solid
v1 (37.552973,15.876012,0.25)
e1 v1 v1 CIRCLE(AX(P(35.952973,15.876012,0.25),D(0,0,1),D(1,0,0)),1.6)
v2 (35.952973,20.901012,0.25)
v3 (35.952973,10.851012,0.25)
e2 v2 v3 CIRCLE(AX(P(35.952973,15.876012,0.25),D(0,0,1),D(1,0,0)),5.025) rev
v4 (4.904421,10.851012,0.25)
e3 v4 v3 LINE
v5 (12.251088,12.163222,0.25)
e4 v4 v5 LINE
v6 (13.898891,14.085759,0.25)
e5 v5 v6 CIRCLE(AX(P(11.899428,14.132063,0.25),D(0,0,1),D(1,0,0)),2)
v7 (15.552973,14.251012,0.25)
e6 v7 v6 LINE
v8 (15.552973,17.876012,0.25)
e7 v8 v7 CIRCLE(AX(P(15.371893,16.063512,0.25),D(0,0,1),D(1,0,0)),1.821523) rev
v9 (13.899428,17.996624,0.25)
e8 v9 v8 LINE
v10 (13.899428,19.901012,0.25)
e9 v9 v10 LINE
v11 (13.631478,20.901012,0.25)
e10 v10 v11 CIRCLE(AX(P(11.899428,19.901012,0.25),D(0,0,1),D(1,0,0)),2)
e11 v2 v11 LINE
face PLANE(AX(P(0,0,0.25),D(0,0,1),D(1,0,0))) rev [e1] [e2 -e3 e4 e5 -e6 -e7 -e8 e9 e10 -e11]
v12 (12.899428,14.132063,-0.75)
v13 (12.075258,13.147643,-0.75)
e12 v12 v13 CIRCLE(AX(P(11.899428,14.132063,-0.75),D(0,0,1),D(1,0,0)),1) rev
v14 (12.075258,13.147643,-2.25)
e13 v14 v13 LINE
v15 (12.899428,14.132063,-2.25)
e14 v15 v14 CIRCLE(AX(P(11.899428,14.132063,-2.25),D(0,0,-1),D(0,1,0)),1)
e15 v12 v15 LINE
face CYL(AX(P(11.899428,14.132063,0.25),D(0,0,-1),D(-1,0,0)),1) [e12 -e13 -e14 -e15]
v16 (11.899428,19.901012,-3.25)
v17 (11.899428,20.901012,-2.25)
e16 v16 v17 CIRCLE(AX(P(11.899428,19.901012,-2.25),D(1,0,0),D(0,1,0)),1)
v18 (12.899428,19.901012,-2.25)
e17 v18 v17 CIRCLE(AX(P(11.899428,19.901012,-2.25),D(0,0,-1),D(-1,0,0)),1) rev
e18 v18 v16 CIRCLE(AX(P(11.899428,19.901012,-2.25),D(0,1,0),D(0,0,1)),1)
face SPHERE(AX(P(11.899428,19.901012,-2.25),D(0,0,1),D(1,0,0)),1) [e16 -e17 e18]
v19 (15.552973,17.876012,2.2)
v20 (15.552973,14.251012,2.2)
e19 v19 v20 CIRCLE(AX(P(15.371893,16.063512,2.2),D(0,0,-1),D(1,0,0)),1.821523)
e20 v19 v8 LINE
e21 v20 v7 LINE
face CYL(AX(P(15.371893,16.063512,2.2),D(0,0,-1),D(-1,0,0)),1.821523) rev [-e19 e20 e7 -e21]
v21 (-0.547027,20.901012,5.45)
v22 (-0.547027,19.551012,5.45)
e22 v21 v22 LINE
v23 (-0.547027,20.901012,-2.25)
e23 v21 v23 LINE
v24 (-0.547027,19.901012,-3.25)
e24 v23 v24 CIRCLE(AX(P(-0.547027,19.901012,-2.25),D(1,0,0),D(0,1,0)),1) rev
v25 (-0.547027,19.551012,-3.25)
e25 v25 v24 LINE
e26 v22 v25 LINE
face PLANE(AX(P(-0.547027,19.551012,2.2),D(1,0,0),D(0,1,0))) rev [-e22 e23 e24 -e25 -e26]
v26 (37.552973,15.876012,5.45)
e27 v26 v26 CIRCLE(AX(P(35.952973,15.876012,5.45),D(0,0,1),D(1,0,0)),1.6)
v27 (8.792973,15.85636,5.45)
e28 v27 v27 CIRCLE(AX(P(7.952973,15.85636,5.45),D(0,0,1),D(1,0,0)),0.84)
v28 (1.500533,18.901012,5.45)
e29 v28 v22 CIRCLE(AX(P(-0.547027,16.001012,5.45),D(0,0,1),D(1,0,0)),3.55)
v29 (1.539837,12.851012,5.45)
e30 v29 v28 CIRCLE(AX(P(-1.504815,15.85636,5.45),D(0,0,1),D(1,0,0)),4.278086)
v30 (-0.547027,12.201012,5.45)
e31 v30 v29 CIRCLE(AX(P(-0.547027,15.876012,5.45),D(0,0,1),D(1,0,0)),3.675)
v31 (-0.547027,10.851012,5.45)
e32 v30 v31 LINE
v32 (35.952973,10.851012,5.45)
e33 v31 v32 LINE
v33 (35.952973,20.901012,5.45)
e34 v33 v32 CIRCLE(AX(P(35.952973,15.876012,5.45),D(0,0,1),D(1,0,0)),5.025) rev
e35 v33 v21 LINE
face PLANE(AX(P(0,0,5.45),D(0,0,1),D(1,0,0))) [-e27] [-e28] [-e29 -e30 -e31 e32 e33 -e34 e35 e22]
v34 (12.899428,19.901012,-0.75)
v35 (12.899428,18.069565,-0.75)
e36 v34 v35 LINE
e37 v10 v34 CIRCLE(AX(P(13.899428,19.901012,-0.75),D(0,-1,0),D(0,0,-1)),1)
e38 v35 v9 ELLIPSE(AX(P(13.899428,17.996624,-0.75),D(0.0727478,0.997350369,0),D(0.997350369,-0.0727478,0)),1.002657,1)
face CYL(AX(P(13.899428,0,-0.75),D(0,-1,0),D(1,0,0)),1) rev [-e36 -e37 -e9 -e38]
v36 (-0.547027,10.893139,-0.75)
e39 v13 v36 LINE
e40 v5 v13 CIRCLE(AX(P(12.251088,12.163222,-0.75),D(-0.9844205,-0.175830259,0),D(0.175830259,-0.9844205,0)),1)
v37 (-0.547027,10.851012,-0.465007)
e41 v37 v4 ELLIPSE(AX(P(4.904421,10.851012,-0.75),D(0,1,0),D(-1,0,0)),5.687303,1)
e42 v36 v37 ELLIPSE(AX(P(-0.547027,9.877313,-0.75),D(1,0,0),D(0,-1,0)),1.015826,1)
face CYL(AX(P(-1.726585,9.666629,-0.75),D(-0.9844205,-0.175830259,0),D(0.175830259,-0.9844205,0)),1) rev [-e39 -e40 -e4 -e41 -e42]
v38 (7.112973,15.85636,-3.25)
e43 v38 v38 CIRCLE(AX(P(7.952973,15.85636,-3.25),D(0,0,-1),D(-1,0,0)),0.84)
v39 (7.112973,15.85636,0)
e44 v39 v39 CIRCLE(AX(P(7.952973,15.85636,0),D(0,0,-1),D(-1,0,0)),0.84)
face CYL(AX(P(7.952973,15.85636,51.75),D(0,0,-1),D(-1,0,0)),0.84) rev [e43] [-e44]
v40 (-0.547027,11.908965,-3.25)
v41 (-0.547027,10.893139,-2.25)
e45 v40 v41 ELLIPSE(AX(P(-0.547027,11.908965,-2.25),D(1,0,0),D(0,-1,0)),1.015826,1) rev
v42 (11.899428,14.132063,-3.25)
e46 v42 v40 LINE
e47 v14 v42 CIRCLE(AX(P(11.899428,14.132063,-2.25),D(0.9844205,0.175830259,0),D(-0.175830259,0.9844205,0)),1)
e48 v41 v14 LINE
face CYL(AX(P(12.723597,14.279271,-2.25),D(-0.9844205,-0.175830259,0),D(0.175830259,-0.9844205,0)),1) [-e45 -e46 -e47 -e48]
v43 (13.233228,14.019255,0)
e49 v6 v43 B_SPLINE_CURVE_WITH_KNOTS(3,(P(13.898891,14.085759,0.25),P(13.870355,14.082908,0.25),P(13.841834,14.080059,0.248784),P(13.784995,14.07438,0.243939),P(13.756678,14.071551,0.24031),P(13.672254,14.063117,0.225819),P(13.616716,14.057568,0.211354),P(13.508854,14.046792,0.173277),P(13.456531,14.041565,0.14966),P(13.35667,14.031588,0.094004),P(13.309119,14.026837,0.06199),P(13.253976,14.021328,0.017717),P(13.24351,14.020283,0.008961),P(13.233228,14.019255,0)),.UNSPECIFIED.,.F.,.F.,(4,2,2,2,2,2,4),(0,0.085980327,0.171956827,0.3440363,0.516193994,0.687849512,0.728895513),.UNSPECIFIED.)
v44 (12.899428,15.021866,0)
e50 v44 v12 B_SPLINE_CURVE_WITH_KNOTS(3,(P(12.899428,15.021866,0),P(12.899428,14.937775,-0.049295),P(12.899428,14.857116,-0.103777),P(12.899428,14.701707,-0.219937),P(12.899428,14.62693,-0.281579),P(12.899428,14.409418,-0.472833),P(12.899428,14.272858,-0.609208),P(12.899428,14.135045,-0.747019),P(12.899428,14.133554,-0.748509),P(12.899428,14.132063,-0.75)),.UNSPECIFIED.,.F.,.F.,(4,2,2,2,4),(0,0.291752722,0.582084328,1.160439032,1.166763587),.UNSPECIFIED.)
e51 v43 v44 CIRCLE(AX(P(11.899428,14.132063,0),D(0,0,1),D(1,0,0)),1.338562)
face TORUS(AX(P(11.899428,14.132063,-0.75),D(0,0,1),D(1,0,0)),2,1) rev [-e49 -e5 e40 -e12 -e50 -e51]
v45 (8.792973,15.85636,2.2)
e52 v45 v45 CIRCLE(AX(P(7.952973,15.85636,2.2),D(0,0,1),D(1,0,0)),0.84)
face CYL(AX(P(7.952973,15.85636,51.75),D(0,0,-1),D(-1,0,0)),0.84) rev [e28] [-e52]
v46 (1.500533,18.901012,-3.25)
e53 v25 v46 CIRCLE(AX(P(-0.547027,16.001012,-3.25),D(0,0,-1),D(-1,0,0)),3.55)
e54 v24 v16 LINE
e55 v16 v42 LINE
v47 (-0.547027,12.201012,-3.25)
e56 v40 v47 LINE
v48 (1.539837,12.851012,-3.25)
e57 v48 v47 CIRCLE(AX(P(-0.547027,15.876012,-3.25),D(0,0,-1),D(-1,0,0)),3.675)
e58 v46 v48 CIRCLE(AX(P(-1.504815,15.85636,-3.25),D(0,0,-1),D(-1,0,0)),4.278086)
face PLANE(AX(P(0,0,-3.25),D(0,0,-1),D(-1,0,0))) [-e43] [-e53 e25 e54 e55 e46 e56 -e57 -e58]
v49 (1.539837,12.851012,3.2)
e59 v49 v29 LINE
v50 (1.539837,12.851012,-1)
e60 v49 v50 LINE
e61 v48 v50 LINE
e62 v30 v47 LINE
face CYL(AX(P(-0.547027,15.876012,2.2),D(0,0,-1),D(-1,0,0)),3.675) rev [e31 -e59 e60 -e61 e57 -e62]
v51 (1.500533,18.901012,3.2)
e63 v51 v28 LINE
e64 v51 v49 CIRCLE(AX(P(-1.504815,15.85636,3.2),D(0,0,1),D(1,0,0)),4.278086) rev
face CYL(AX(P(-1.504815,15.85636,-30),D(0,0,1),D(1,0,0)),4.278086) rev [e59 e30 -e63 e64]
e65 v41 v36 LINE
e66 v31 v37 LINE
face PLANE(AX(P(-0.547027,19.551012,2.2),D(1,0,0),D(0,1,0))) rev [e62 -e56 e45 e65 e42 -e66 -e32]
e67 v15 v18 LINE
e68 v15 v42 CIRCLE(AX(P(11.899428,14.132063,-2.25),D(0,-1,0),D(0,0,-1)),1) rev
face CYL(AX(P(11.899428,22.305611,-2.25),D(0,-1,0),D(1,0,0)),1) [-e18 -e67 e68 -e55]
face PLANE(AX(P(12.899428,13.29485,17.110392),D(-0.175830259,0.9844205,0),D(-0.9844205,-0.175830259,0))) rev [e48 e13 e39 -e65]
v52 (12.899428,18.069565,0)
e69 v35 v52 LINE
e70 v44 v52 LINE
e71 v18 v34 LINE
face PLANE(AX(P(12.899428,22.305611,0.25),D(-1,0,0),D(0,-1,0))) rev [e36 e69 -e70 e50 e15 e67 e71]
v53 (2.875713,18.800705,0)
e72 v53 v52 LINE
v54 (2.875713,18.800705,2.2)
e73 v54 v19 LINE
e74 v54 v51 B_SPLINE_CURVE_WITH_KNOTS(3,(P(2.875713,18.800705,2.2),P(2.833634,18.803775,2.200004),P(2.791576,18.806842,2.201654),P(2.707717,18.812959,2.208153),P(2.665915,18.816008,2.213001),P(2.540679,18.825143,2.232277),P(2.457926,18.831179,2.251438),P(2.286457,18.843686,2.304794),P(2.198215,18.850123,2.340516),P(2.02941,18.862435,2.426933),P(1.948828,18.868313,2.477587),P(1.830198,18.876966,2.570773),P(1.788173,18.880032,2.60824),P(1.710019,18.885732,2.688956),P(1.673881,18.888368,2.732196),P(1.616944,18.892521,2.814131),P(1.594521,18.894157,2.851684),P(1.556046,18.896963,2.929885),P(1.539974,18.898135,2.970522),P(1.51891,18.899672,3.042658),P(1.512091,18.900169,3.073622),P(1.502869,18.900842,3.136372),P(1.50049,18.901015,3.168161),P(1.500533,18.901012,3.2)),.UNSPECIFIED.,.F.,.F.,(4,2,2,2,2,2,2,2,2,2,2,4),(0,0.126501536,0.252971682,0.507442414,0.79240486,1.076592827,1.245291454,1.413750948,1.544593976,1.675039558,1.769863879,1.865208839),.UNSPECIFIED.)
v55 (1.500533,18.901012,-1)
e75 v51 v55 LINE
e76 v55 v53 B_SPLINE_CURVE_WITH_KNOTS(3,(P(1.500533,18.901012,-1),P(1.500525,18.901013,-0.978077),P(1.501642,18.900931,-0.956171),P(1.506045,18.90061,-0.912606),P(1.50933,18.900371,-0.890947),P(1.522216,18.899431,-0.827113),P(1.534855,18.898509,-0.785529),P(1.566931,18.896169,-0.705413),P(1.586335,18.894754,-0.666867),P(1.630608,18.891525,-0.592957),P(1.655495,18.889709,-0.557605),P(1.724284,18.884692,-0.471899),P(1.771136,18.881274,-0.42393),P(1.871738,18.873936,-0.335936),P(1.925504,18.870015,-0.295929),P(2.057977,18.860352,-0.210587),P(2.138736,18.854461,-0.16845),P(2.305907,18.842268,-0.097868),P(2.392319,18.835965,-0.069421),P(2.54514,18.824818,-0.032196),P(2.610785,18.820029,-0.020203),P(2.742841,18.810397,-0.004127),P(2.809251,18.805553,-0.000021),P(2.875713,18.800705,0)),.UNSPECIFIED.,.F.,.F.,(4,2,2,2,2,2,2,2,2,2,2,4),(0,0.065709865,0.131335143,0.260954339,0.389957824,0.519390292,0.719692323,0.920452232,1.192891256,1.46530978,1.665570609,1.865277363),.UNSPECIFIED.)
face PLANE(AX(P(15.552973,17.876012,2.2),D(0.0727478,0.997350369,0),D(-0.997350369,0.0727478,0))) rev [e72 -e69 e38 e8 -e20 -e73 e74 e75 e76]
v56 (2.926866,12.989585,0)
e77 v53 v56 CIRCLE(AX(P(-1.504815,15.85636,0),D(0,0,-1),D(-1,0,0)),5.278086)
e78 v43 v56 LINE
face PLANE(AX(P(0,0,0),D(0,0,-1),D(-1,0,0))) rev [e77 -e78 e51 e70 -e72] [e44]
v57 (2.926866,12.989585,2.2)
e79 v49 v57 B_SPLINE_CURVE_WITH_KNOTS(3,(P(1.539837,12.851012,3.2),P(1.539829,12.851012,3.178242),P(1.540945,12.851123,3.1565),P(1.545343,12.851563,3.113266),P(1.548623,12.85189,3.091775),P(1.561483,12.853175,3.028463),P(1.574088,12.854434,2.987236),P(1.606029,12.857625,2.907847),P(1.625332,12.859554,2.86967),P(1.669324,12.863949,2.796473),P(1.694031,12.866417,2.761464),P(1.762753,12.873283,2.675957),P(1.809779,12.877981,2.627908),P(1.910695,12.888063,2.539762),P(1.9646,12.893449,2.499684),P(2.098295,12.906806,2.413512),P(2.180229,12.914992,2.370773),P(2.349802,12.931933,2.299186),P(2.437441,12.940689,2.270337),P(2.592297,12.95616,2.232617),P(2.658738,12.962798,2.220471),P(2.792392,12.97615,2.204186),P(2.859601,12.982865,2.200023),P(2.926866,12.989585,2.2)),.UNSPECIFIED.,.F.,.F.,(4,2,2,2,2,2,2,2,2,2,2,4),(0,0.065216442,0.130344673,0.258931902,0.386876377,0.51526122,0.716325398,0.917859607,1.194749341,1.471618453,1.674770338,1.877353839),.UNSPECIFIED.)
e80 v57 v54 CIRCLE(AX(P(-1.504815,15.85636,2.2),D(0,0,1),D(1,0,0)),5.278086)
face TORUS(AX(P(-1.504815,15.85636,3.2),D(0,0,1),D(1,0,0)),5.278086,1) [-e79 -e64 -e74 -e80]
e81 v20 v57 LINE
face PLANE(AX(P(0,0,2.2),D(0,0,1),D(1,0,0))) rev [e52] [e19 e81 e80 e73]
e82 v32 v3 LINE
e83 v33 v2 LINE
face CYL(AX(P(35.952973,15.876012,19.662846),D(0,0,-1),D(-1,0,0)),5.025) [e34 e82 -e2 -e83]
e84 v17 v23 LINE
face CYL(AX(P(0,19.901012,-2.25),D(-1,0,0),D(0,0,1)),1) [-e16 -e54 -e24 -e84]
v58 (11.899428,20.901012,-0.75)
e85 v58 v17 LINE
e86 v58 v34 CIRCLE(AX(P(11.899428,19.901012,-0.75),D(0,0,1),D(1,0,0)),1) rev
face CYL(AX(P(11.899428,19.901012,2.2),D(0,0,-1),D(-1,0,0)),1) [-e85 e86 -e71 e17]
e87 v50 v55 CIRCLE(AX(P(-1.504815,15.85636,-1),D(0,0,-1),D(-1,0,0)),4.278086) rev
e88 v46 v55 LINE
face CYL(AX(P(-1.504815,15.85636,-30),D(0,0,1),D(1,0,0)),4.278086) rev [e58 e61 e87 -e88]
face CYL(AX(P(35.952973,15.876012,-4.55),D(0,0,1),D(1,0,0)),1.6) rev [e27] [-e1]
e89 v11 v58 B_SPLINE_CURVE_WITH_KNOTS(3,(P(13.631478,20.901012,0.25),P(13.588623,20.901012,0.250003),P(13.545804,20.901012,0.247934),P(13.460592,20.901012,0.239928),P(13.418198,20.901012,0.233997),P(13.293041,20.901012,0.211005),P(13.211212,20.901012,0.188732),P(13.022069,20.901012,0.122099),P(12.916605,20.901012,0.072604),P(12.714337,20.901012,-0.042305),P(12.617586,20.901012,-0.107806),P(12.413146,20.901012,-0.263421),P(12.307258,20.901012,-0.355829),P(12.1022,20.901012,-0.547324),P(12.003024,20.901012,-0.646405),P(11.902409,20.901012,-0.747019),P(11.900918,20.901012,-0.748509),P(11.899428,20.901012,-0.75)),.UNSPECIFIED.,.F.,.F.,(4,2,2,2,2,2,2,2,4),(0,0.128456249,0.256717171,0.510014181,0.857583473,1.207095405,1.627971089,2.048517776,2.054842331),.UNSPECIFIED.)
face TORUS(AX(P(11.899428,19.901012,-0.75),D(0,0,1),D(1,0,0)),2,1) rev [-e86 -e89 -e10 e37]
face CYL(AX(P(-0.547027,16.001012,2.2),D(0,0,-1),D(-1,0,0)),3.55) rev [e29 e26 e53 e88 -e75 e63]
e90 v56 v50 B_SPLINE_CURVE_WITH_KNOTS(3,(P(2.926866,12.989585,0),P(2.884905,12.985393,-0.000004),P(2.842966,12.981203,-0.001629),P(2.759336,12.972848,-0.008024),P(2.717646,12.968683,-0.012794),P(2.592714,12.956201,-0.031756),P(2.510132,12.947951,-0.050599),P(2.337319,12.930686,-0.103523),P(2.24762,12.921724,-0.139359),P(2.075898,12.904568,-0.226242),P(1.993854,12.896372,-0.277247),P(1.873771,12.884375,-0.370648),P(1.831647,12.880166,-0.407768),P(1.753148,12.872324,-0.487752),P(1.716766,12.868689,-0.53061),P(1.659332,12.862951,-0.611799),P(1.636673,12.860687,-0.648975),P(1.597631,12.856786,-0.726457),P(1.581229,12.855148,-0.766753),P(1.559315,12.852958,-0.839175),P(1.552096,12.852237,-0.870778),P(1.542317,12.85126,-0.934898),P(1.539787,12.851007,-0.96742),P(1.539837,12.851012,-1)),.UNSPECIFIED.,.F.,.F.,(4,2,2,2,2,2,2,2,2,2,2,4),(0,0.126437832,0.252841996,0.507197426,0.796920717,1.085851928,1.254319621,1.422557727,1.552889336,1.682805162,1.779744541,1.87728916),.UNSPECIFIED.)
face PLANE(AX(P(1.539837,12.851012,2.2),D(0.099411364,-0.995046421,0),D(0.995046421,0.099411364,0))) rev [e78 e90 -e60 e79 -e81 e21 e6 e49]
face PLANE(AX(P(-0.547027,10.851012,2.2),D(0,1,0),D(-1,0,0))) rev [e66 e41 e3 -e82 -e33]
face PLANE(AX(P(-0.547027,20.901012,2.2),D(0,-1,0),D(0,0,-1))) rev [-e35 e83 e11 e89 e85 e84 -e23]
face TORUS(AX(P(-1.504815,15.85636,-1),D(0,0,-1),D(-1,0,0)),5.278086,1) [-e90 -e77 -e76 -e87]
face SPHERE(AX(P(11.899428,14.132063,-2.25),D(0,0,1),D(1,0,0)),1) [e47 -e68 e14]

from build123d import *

# Parameters (mm, degrees)
EXTRUDE_1_DEPTH     = 2.2
SKETCH_2_W          = 36.5
SKETCH_2_H          = 10.05
EXTRUDE_2_DEPTH     = 3.25
SKETCH_3_W          = 36.5
SKETCH_3_H          = 10.05
EXTRUDE_3_DEPTH     = 3.25
CUT_EXTRUDE_1_DEPTH = 30
SKETCH_6_R          = 5.025
EXTRUDE_4_DEPTH     = 8.7
SKETCH_8_R          = 1.675
SKETCH_8_R_2        = 0.84
CUT_EXTRUDE_3_DEPTH = 55
SKETCH_9_W          = 53.416465659
SKETCH_9_H          = 14.532409192
CUT_EXTRUDE_4_DEPTH = 3.5
SKETCH_10_R         = 1.6
CUT_EXTRUDE_5_DEPTH = 10
CUT_EXTRUDE_6_DEPTH = 3.5
FILLET_1_R          = 1
FILLET_2_R          = 1
FILLET_3_R          = 1


with BuildPart() as part:
    # 草图1 → 凸台-拉伸1 (new body)
    with BuildSketch(Plane.XY):
        with BuildLine():
            Line((1.539836705, 12.851012384), (15.55297303, 14.251012384))
            ThreePointArc((15.55297303, 14.251012384), (17.193415997, 16.063512384), (15.55297303, 17.876012384))
            Line((15.55297303, 17.876012384), (1.500532553, 18.901012384))
            ThreePointArc((1.500532553, 18.901012384), (0.527100583, 19.384612538), (-0.54702697, 19.551012384))
            Line((-0.54702697, 19.551012384), (-0.54702697, 20.901012384))
            Line((-0.54702697, 20.901012384), (19.51277613, 20.901012384))
            Line((19.51277613, 20.901012384), (35.95297303, 20.901012384))
            Line((35.95297303, 20.901012384), (35.95297303, 10.851012384))
            Line((35.95297303, 10.851012384), (-0.54702697, 10.851012384))
            Line((-0.54702697, 10.851012384), (-0.54702697, 12.201012384))
            ThreePointArc((-0.54702697, 12.201012384), (0.54584768, 12.367273294), (1.539836705, 12.851012384))
        make_face()
    extrude(amount=EXTRUDE_1_DEPTH)

    # 草图2 → 凸台-拉伸2 (add)
    with BuildSketch(Plane(origin=(0, 0, 0), x_dir=(-1, 0, 0), z_dir=(0, 0, -1))):
        with Locations((-17.70297303, 15.876012384)):
            Rectangle(SKETCH_2_W, SKETCH_2_H)
    extrude(amount=EXTRUDE_2_DEPTH)

    # 草图3 → 凸台-拉伸3 (add)
    with BuildSketch(Plane.XY.offset(2.2)):
        with Locations((17.70297303, 15.876012384)):
            Rectangle(SKETCH_3_W, SKETCH_3_H)
    extrude(amount=EXTRUDE_3_DEPTH)

    # 草图4 → 切除-拉伸1 (cut, symmetric)
    with BuildSketch(Plane.XY):
        with BuildLine():
            Line((-0.54702697, 19.551012384), (-2.235397712, 16.616091152))
            Line((-2.235397712, 16.616091152), (-1.110896638, 12.310548833))
            Line((-1.110896638, 12.310548833), (-0.54702697, 12.201012384))
            ThreePointArc((-0.54702697, 12.201012384), (0.54584768, 12.367273294), (1.539836705, 12.851012384))
            ThreePointArc((1.539836705, 12.851012384), (2.773180655, 15.88415254), (1.500532553, 18.901012384))
            ThreePointArc((1.500532553, 18.901012384), (0.527100583, 19.384612538), (-0.54702697, 19.551012384))
        make_face()
    extrude(amount=CUT_EXTRUDE_1_DEPTH, both=True, mode=Mode.SUBTRACT)

    # 草图6 → 凸台-拉伸4 (add)
    with BuildSketch(Plane(origin=(0, 0, -3.25), x_dir=(-1, 0, 0), z_dir=(0, 0, -1))):
        with Locations((-35.95297303, 15.876012384)):
            Circle(SKETCH_6_R)
    extrude(amount=-EXTRUDE_4_DEPTH)

    # 草图8 → 切除-拉伸3 (cut)
    with BuildSketch(Plane(origin=(0, 0, -3.25), x_dir=(-1, 0, 0), z_dir=(0, 0, -1))):
        with Locations((-49.45297303, 15.876012384)):
            Circle(SKETCH_8_R)
        with Locations(Location((-7.95297303, 15.856360308, 0), (0, 0, 180))):
            Circle(SKETCH_8_R_2)
    extrude(amount=-CUT_EXTRUDE_3_DEPTH, mode=Mode.SUBTRACT)

    # 草图9 → 切除-拉伸4 (cut)
    with BuildSketch(Plane(origin=(0, 0, -3.25), x_dir=(-1, 0, 0), z_dir=(0, 0, -1))):
        with Locations((-39.607660409, 15.039406696)):
            Rectangle(SKETCH_9_W, SKETCH_9_H)
    extrude(amount=-CUT_EXTRUDE_4_DEPTH, mode=Mode.SUBTRACT)

    # 草图10 → 切除-拉伸5 (cut)
    with BuildSketch(Plane.XY.offset(5.45)):
        with Locations((35.95297303, 15.876012384)):
            Circle(SKETCH_10_R)
    extrude(amount=-CUT_EXTRUDE_5_DEPTH, mode=Mode.SUBTRACT)

    # 草图11 → 切除-拉伸6 (cut)
    with BuildSketch(Plane(origin=(0, 0, -3.25), x_dir=(-1, 0, 0), z_dir=(0, 0, -1))):
        Polygon((-12.89942758, 13.294850275), (0.782882432, 10.851012384), (0, 8.730799831), (-15.448021962, 9.415407398), align=None)
    extrude(amount=-CUT_EXTRUDE_6_DEPTH, mode=Mode.SUBTRACT)

    # 圆角1
    fillet_1_edges = [part.edges().sort_by_distance(p)[0] for p in [
        (12.89942758, 20.901012384, -1.5),
        (12.89942758, 13.294850275, -1.5),
        (6.176200305, 12.093994751, -3.25),
        (12.89942758, 17.09793133, -3.25),
        (6.176200305, 20.901012384, -3.25),
    ]]
    fillet(fillet_1_edges, radius=FILLET_1_R)

    # 圆角2
    # the kernel refuses this fillet: 1 mm, written as the material it adds along each edge
    with BuildSketch(Plane(origin=(11.89942758, 14.132063378, 0.25), x_dir=(0.17583025935665297, -0.9844204995298362, 0), z_dir=(-0.9844204995298362, -0.17583025935665297, 0))) as fillet_2_piece_1_section:
        with BuildLine():
            CenterArc((1 + FILLET_2_R, -FILLET_2_R), FILLET_2_R, 90, 90)
            Line((1, -FILLET_2_R), (1, 0))
            Line((1, 0), (1 + FILLET_2_R, 0))
        make_face()
    fillet_2_piece_1 = revolve(axis=Axis((11.89942758, 14.132063378, 0.25), (0, 0, 1)), revolution_arc=214.681339144, mode=Mode.PRIVATE)
    fillet_2_piece_1 = split(fillet_2_piece_1, bisect_by=Plane(origin=(12.386461292, 13.934658048, 0.148039327), z_dir=(0.0994113635758644, -0.9950464214256476, 0)), keep=Keep.TOP, mode=Mode.PRIVATE)
    add(fillet_2_piece_1)
    with BuildSketch(Plane(origin=(11.89942758, 14.132063378, 0.25), x_dir=(0.17583025935665297, -0.9844204995298362, 0), z_dir=(-0.9844204995298362, -0.17583025935665297, 0))) as fillet_2_piece_2_section:
        with BuildLine():
            CenterArc((1 + FILLET_2_R, -FILLET_2_R), FILLET_2_R, 90, 90)
            Line((1, -FILLET_2_R), (1, 0))
            Line((1, 0), (1 + FILLET_2_R, 0))
        make_face()
    fillet_2_piece_2 = revolve(axis=Axis((11.89942758, 14.132063378, 0.25), (0, 0, 1)), revolution_arc=214.681339144, mode=Mode.PRIVATE)
    fillet_2_piece_2 = split(fillet_2_piece_2, bisect_by=Plane(origin=(12.896125684, 14.022775497, 0), z_dir=(0, 0, -1)), keep=Keep.TOP, mode=Mode.PRIVATE)
    add(fillet_2_piece_2)
    with BuildSketch(Plane(origin=(12.07525784, 13.147642879, 0.25), x_dir=(0, 0, -1), z_dir=(-0.984420499529836, -0.17583025935665386, 0))) as fillet_2_piece_3_section:
        with BuildLine():
            CenterArc((FILLET_2_R, FILLET_2_R), FILLET_2_R, 180, 90)
            Line((0, FILLET_2_R), (0, 0))
            Line((0, 0), (FILLET_2_R, 0))
        make_face()
    fillet_2_piece_3 = extrude(amount=15.32204588, mode=Mode.PRIVATE)
    fillet_2_piece_3 = split(fillet_2_piece_3, bisect_by=Plane(origin=(-0.54702697, 11.899303342, 0.017148227), z_dir=(1, 0, 0)), keep=Keep.TOP, mode=Mode.PRIVATE)
    fillet_2_piece_3 = split(fillet_2_piece_3, bisect_by=Plane(origin=(6.26358972, 10.851012384, 0.017148227), z_dir=(0, 1, 0)), keep=Keep.TOP, mode=Mode.PRIVATE)
    add(fillet_2_piece_3)
    with BuildSketch(Plane(origin=(11.89942758, 19.901012384, 0.25), x_dir=(-0.5976672776328282, -0.8017442392976477, 0), z_dir=(0.8017442392976477, -0.5976672776328282, 0))) as fillet_2_piece_4_section:
        with BuildLine():
            CenterArc((1 + FILLET_2_R, FILLET_2_R), FILLET_2_R, 180, 90)
            Line((1 + FILLET_2_R, 0), (1, 0))
            Line((1, 0), (1, FILLET_2_R))
        make_face()
    fillet_2_piece_4 = revolve(axis=Axis((11.89942758, 19.901012384, 0.25), (0, 0, -1)), revolution_arc=233.296989237, mode=Mode.PRIVATE)
    fillet_2_piece_4 = split(fillet_2_piece_4, bisect_by=Plane(origin=(12.649366525, 20.901012384, -0.061628308), z_dir=(0, -1, 0)), keep=Keep.TOP, mode=Mode.PRIVATE)
    add(fillet_2_piece_4)
    with BuildSketch(Plane(origin=(12.89942758, 15.56956482, 0.25), x_dir=(0, 0, -1), z_dir=(0, 1, 0))) as fillet_2_piece_5_section:
        with BuildLine():
            CenterArc((FILLET_2_R, -FILLET_2_R), FILLET_2_R, 90, 90)
            Line((0, -FILLET_2_R), (0, 0))
            Line((0, 0), (FILLET_2_R, 0))
        make_face()
    fillet_2_piece_5 = extrude(amount=4.331447564, mode=Mode.PRIVATE)
    fillet_2_piece_5 = split(fillet_2_piece_5, bisect_by=Plane(origin=(12.930705697, 18.067283361, -0.180311335), z_dir=(0.0727477998867751, 0.9973503685323598, 0)), keep=Keep.TOP, mode=Mode.PRIVATE)
    add(fillet_2_piece_5)

    # 圆角3
    fillet_3_edges = [part.edges().sort_by_distance(p)[0] for p in [
        (2.773180655, 15.88415254, 0),
        (2.773180655, 15.88415254, 2.2),
    ]]
    fillet(fillet_3_edges, radius=FILLET_3_R)


solid = part.part
